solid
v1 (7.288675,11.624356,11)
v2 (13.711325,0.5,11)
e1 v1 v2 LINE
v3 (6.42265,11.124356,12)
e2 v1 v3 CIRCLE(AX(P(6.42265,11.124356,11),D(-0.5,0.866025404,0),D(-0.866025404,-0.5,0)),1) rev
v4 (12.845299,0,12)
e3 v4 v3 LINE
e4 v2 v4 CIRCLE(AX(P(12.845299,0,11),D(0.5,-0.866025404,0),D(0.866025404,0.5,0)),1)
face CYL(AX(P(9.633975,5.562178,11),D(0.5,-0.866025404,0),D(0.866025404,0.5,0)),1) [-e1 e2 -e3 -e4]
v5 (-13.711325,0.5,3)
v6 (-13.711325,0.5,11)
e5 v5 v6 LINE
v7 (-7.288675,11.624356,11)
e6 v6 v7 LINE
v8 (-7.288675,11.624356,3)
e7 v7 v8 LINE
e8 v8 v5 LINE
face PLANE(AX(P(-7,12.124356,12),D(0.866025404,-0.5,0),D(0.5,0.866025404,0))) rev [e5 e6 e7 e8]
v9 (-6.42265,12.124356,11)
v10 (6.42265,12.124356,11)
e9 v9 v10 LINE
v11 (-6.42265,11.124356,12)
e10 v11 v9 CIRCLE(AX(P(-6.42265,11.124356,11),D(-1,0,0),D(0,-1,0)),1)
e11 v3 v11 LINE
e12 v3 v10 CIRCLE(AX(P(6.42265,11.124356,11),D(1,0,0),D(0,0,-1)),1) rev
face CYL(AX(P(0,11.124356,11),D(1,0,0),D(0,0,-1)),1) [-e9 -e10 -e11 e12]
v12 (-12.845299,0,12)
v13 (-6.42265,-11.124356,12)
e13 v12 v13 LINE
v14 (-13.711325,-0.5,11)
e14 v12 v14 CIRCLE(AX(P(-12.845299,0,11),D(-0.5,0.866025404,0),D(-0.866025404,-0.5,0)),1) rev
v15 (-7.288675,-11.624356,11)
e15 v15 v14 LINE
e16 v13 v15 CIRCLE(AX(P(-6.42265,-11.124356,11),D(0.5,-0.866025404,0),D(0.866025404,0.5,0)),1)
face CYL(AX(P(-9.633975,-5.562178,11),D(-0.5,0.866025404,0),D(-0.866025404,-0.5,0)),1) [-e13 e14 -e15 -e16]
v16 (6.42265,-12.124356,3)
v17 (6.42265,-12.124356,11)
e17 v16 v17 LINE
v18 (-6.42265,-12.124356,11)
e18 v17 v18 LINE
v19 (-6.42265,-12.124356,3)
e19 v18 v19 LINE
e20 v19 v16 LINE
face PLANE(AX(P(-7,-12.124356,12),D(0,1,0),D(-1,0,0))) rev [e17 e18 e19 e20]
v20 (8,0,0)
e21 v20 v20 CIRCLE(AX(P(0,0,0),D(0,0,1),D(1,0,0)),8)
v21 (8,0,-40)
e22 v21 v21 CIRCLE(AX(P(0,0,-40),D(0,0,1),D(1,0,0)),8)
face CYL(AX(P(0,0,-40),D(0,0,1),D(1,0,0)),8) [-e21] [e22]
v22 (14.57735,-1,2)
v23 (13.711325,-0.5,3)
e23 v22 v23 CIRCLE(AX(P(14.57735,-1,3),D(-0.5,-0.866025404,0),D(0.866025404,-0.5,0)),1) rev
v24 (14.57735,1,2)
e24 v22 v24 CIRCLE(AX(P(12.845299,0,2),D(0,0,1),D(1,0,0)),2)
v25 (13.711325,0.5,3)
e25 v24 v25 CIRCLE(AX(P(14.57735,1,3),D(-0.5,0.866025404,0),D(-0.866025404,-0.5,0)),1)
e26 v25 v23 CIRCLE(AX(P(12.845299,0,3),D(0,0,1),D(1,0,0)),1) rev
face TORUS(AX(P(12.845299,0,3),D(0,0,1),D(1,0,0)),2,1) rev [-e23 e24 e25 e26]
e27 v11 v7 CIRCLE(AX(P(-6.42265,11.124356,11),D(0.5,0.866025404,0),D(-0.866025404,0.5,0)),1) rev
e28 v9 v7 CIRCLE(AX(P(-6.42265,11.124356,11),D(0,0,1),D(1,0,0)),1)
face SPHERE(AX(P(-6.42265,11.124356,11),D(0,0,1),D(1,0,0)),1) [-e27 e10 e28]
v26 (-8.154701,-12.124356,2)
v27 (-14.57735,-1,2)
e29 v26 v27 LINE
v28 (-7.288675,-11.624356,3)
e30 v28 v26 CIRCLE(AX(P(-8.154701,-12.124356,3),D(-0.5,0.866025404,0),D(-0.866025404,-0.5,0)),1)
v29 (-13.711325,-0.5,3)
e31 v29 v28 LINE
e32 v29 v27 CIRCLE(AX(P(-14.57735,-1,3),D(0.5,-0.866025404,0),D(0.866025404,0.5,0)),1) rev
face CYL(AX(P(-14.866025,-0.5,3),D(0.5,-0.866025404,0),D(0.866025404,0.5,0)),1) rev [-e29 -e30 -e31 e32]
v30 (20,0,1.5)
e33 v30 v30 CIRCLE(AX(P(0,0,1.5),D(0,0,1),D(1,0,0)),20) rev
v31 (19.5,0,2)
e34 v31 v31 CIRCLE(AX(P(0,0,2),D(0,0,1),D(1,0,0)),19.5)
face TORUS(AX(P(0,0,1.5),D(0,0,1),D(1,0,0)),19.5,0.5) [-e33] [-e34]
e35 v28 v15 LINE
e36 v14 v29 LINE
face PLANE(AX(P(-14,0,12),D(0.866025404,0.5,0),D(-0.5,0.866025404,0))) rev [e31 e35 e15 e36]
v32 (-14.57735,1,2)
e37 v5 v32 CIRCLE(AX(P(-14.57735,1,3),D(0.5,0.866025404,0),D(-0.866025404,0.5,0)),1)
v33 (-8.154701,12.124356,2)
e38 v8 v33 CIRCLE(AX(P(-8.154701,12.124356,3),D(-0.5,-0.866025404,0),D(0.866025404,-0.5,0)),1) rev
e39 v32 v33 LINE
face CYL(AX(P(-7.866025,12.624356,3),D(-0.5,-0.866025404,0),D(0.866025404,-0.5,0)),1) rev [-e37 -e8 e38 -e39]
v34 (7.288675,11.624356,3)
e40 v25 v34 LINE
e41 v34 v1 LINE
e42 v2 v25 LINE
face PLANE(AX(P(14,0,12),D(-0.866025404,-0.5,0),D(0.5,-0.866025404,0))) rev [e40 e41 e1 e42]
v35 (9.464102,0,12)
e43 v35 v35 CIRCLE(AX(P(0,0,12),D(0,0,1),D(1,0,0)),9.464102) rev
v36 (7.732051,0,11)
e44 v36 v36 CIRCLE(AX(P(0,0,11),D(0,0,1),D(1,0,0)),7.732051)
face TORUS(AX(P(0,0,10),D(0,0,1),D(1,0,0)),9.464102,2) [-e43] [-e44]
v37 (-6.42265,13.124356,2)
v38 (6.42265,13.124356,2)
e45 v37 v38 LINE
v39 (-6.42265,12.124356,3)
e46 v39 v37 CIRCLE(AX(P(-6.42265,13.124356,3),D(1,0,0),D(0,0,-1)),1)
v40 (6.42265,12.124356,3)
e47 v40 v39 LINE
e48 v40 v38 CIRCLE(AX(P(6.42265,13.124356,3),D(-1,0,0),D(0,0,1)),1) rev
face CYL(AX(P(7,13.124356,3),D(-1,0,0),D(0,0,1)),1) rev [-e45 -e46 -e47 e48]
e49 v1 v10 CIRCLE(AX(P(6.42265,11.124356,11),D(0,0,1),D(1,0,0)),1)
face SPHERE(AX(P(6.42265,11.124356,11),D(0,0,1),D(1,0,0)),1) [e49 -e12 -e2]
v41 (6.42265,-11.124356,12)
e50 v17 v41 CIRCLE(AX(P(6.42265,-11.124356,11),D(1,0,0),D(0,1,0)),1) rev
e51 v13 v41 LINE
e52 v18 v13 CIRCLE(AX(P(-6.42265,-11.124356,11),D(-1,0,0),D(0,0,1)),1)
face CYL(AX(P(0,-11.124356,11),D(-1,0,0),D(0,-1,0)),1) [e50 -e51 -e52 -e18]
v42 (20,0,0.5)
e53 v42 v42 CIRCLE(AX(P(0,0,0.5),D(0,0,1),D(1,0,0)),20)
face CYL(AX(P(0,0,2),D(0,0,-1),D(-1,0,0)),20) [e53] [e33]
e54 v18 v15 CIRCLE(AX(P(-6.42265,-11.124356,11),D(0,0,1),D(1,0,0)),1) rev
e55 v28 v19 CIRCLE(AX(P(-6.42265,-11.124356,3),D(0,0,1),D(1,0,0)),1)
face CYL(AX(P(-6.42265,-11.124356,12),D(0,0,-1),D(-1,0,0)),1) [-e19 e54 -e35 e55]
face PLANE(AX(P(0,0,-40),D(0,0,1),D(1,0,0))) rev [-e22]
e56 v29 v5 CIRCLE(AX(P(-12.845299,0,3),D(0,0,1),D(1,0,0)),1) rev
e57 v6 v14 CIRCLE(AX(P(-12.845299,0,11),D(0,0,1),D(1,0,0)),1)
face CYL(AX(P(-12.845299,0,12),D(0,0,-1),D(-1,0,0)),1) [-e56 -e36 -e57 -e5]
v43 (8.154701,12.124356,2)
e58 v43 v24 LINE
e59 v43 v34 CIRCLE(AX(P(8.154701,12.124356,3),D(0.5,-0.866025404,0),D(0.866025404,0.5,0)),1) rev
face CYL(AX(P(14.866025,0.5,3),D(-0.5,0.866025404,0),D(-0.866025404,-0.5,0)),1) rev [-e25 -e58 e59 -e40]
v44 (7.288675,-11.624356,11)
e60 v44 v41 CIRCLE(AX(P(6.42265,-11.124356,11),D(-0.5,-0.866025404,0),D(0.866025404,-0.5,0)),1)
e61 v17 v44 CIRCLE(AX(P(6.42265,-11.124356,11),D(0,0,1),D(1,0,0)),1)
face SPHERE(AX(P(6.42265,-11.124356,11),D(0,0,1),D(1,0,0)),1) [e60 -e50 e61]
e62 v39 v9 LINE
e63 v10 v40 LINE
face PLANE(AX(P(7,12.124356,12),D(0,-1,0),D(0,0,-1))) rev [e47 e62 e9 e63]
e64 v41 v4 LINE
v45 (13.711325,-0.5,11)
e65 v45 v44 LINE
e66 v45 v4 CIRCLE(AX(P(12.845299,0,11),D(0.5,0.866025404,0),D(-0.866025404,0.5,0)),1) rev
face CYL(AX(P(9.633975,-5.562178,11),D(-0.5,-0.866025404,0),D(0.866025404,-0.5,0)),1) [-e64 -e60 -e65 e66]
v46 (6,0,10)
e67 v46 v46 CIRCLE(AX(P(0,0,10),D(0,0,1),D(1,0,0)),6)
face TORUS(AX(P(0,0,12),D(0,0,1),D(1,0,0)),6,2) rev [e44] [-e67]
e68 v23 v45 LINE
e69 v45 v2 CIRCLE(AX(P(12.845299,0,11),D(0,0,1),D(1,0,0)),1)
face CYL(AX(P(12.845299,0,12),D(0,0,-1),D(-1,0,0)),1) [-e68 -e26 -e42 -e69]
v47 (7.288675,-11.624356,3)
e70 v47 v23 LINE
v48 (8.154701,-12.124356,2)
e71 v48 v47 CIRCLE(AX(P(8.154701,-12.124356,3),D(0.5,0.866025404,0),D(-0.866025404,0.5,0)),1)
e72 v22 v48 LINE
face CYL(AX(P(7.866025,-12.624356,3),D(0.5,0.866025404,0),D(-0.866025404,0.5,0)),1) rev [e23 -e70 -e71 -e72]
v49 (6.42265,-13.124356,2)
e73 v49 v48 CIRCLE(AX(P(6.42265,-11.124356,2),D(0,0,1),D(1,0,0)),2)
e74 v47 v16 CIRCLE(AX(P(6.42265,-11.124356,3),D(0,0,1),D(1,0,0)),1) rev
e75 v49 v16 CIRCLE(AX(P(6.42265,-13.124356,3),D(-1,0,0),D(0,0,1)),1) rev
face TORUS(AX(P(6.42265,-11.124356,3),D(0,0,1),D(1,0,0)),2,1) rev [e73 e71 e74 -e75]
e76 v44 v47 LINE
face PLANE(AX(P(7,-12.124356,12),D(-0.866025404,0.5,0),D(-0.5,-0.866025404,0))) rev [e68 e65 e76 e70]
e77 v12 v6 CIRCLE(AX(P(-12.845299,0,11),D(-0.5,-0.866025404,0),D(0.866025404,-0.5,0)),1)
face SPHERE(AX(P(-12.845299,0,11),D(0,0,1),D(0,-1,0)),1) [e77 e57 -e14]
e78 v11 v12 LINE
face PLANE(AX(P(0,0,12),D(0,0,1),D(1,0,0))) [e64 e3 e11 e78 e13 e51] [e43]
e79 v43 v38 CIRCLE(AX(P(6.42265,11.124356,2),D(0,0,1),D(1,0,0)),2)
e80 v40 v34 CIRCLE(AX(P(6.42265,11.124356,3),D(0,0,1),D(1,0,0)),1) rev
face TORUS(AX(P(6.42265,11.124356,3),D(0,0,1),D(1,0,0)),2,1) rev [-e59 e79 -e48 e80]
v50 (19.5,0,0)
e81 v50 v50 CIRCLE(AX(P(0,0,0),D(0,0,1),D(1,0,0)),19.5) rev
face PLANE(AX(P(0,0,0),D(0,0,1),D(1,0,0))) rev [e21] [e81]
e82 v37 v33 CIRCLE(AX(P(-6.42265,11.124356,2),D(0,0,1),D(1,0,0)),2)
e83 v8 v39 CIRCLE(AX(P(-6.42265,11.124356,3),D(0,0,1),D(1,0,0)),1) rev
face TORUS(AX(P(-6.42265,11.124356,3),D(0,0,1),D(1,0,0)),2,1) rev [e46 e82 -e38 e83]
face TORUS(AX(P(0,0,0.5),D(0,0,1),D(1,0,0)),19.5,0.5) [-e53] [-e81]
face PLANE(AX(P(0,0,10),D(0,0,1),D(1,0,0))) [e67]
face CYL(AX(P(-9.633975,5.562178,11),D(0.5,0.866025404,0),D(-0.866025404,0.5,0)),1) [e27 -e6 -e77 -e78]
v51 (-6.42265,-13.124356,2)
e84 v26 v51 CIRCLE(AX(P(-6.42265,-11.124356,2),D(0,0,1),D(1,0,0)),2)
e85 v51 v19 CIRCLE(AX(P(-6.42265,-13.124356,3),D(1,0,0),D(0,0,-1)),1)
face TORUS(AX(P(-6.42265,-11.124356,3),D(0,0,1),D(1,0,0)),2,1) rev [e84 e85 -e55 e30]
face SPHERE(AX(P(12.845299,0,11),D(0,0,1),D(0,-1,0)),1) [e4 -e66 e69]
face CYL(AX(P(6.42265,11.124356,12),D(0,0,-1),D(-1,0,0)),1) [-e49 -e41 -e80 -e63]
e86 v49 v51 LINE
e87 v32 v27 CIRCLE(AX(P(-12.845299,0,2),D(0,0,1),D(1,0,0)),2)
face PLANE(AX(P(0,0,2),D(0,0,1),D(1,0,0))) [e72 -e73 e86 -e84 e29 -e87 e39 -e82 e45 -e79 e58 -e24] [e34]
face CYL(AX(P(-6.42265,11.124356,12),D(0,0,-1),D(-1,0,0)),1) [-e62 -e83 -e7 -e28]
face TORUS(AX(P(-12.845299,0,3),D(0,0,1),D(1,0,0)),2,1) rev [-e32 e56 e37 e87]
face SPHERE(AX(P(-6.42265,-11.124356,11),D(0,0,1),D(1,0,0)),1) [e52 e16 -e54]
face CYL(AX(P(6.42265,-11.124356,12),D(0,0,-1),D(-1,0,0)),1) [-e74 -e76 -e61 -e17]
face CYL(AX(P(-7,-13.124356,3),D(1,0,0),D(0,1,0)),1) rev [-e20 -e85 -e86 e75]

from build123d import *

# Parameters (mm, degrees)
SKETCH1_R           = 8
BOSS_EXTRUDE1_DEPTH = 40
SKETCH1_3_R         = 20
BOSS_EXTRUDE2_DEPTH = 2
BOSS_EXTRUDE3_DEPTH = 10
CUT_EXTRUDE1_START  = 10
SKETCH2_3_R         = 8
CUT_EXTRUDE1_DEPTH  = 2
FILLET1_R           = 0.5
FILLET2_R           = 1
FILLET3_R           = 2
FILLET4_R           = 2


with BuildPart() as part:
    # Sketch1 → Boss-Extrude1 (new body)
    with BuildSketch(Plane(origin=(0, 0, 0), x_dir=(0, 1, 0), z_dir=(0, 0, 1))):
        with Locations(Location((0, 0, 0), (0, 0, 270))):
            Circle(SKETCH1_R)
    extrude(amount=-BOSS_EXTRUDE1_DEPTH)

    # Sketch1<3> → Boss-Extrude2 (add)
    with BuildSketch(Plane(origin=(0, 0, 0), x_dir=(0, 1, 0), z_dir=(0, 0, 1))):
        with Locations(Location((0, 0, 0), (0, 0, 270))):
            Circle(SKETCH1_3_R)
    extrude(amount=BOSS_EXTRUDE2_DEPTH)

    # Sketch2 → Boss-Extrude3 (add)
    with BuildSketch(Plane.XY.offset(2)):
        Polygon((-14, 0), (-7, -12.124355653), (7, -12.124355653), (14, 0), (7, 12.124355653), (-7, 12.124355653), align=None)
    extrude(amount=BOSS_EXTRUDE3_DEPTH)

    # Sketch2<3> → Cut-Extrude1 (cut)
    with BuildSketch(Plane.XY.offset(2).offset(CUT_EXTRUDE1_START)):
        Circle(SKETCH2_3_R)
    extrude(amount=-CUT_EXTRUDE1_DEPTH, mode=Mode.SUBTRACT)

    # Fillet1
    fillet1_edges = [part.edges().sort_by_distance(p)[0] for p in [
        (-20, 0, 0),
        (-20, 0, 2),
    ]]
    fillet(fillet1_edges, radius=FILLET1_R)

    # Fillet2
    fillet2_edges = [part.edges().sort_by_distance(p)[0] for p in [
        (0, -12.124355653, 2),
        (-7, -12.124355653, 7),
        (10.5, -6.062177826, 2),
        (7, -12.124355653, 7),
        (10.5, 6.062177826, 2),
        (14, 0, 7),
        (0, 12.124355653, 2),
        (7, 12.124355653, 7),
        (-10.5, 6.062177826, 2),
        (-7, 12.124355653, 7),
        (-10.5, -6.062177826, 2),
        (-14, 0, 7),
        (0, -12.124355653, 12),
        (10.5, -6.062177826, 12),
        (10.5, 6.062177826, 12),
        (0, 12.124355653, 12),
        (-10.5, 6.062177826, 12),
        (-10.5, -6.062177826, 12),
    ]]
    fillet(fillet2_edges, radius=FILLET2_R)

    # Fillet3
    fillet3_edges = [part.edges().sort_by_distance(p)[0] for p in [
        (-8, 0, 10),
    ]]
    fillet(fillet3_edges, radius=FILLET3_R - 0.0001)  # a hair under: the kernel refuses the full size

    # Fillet4
    fillet4_edges = [part.edges().sort_by_distance(p)[0] for p in [
        (-8, 0, 12),
    ]]
    fillet(fillet4_edges, radius=FILLET4_R)


solid = part.part
